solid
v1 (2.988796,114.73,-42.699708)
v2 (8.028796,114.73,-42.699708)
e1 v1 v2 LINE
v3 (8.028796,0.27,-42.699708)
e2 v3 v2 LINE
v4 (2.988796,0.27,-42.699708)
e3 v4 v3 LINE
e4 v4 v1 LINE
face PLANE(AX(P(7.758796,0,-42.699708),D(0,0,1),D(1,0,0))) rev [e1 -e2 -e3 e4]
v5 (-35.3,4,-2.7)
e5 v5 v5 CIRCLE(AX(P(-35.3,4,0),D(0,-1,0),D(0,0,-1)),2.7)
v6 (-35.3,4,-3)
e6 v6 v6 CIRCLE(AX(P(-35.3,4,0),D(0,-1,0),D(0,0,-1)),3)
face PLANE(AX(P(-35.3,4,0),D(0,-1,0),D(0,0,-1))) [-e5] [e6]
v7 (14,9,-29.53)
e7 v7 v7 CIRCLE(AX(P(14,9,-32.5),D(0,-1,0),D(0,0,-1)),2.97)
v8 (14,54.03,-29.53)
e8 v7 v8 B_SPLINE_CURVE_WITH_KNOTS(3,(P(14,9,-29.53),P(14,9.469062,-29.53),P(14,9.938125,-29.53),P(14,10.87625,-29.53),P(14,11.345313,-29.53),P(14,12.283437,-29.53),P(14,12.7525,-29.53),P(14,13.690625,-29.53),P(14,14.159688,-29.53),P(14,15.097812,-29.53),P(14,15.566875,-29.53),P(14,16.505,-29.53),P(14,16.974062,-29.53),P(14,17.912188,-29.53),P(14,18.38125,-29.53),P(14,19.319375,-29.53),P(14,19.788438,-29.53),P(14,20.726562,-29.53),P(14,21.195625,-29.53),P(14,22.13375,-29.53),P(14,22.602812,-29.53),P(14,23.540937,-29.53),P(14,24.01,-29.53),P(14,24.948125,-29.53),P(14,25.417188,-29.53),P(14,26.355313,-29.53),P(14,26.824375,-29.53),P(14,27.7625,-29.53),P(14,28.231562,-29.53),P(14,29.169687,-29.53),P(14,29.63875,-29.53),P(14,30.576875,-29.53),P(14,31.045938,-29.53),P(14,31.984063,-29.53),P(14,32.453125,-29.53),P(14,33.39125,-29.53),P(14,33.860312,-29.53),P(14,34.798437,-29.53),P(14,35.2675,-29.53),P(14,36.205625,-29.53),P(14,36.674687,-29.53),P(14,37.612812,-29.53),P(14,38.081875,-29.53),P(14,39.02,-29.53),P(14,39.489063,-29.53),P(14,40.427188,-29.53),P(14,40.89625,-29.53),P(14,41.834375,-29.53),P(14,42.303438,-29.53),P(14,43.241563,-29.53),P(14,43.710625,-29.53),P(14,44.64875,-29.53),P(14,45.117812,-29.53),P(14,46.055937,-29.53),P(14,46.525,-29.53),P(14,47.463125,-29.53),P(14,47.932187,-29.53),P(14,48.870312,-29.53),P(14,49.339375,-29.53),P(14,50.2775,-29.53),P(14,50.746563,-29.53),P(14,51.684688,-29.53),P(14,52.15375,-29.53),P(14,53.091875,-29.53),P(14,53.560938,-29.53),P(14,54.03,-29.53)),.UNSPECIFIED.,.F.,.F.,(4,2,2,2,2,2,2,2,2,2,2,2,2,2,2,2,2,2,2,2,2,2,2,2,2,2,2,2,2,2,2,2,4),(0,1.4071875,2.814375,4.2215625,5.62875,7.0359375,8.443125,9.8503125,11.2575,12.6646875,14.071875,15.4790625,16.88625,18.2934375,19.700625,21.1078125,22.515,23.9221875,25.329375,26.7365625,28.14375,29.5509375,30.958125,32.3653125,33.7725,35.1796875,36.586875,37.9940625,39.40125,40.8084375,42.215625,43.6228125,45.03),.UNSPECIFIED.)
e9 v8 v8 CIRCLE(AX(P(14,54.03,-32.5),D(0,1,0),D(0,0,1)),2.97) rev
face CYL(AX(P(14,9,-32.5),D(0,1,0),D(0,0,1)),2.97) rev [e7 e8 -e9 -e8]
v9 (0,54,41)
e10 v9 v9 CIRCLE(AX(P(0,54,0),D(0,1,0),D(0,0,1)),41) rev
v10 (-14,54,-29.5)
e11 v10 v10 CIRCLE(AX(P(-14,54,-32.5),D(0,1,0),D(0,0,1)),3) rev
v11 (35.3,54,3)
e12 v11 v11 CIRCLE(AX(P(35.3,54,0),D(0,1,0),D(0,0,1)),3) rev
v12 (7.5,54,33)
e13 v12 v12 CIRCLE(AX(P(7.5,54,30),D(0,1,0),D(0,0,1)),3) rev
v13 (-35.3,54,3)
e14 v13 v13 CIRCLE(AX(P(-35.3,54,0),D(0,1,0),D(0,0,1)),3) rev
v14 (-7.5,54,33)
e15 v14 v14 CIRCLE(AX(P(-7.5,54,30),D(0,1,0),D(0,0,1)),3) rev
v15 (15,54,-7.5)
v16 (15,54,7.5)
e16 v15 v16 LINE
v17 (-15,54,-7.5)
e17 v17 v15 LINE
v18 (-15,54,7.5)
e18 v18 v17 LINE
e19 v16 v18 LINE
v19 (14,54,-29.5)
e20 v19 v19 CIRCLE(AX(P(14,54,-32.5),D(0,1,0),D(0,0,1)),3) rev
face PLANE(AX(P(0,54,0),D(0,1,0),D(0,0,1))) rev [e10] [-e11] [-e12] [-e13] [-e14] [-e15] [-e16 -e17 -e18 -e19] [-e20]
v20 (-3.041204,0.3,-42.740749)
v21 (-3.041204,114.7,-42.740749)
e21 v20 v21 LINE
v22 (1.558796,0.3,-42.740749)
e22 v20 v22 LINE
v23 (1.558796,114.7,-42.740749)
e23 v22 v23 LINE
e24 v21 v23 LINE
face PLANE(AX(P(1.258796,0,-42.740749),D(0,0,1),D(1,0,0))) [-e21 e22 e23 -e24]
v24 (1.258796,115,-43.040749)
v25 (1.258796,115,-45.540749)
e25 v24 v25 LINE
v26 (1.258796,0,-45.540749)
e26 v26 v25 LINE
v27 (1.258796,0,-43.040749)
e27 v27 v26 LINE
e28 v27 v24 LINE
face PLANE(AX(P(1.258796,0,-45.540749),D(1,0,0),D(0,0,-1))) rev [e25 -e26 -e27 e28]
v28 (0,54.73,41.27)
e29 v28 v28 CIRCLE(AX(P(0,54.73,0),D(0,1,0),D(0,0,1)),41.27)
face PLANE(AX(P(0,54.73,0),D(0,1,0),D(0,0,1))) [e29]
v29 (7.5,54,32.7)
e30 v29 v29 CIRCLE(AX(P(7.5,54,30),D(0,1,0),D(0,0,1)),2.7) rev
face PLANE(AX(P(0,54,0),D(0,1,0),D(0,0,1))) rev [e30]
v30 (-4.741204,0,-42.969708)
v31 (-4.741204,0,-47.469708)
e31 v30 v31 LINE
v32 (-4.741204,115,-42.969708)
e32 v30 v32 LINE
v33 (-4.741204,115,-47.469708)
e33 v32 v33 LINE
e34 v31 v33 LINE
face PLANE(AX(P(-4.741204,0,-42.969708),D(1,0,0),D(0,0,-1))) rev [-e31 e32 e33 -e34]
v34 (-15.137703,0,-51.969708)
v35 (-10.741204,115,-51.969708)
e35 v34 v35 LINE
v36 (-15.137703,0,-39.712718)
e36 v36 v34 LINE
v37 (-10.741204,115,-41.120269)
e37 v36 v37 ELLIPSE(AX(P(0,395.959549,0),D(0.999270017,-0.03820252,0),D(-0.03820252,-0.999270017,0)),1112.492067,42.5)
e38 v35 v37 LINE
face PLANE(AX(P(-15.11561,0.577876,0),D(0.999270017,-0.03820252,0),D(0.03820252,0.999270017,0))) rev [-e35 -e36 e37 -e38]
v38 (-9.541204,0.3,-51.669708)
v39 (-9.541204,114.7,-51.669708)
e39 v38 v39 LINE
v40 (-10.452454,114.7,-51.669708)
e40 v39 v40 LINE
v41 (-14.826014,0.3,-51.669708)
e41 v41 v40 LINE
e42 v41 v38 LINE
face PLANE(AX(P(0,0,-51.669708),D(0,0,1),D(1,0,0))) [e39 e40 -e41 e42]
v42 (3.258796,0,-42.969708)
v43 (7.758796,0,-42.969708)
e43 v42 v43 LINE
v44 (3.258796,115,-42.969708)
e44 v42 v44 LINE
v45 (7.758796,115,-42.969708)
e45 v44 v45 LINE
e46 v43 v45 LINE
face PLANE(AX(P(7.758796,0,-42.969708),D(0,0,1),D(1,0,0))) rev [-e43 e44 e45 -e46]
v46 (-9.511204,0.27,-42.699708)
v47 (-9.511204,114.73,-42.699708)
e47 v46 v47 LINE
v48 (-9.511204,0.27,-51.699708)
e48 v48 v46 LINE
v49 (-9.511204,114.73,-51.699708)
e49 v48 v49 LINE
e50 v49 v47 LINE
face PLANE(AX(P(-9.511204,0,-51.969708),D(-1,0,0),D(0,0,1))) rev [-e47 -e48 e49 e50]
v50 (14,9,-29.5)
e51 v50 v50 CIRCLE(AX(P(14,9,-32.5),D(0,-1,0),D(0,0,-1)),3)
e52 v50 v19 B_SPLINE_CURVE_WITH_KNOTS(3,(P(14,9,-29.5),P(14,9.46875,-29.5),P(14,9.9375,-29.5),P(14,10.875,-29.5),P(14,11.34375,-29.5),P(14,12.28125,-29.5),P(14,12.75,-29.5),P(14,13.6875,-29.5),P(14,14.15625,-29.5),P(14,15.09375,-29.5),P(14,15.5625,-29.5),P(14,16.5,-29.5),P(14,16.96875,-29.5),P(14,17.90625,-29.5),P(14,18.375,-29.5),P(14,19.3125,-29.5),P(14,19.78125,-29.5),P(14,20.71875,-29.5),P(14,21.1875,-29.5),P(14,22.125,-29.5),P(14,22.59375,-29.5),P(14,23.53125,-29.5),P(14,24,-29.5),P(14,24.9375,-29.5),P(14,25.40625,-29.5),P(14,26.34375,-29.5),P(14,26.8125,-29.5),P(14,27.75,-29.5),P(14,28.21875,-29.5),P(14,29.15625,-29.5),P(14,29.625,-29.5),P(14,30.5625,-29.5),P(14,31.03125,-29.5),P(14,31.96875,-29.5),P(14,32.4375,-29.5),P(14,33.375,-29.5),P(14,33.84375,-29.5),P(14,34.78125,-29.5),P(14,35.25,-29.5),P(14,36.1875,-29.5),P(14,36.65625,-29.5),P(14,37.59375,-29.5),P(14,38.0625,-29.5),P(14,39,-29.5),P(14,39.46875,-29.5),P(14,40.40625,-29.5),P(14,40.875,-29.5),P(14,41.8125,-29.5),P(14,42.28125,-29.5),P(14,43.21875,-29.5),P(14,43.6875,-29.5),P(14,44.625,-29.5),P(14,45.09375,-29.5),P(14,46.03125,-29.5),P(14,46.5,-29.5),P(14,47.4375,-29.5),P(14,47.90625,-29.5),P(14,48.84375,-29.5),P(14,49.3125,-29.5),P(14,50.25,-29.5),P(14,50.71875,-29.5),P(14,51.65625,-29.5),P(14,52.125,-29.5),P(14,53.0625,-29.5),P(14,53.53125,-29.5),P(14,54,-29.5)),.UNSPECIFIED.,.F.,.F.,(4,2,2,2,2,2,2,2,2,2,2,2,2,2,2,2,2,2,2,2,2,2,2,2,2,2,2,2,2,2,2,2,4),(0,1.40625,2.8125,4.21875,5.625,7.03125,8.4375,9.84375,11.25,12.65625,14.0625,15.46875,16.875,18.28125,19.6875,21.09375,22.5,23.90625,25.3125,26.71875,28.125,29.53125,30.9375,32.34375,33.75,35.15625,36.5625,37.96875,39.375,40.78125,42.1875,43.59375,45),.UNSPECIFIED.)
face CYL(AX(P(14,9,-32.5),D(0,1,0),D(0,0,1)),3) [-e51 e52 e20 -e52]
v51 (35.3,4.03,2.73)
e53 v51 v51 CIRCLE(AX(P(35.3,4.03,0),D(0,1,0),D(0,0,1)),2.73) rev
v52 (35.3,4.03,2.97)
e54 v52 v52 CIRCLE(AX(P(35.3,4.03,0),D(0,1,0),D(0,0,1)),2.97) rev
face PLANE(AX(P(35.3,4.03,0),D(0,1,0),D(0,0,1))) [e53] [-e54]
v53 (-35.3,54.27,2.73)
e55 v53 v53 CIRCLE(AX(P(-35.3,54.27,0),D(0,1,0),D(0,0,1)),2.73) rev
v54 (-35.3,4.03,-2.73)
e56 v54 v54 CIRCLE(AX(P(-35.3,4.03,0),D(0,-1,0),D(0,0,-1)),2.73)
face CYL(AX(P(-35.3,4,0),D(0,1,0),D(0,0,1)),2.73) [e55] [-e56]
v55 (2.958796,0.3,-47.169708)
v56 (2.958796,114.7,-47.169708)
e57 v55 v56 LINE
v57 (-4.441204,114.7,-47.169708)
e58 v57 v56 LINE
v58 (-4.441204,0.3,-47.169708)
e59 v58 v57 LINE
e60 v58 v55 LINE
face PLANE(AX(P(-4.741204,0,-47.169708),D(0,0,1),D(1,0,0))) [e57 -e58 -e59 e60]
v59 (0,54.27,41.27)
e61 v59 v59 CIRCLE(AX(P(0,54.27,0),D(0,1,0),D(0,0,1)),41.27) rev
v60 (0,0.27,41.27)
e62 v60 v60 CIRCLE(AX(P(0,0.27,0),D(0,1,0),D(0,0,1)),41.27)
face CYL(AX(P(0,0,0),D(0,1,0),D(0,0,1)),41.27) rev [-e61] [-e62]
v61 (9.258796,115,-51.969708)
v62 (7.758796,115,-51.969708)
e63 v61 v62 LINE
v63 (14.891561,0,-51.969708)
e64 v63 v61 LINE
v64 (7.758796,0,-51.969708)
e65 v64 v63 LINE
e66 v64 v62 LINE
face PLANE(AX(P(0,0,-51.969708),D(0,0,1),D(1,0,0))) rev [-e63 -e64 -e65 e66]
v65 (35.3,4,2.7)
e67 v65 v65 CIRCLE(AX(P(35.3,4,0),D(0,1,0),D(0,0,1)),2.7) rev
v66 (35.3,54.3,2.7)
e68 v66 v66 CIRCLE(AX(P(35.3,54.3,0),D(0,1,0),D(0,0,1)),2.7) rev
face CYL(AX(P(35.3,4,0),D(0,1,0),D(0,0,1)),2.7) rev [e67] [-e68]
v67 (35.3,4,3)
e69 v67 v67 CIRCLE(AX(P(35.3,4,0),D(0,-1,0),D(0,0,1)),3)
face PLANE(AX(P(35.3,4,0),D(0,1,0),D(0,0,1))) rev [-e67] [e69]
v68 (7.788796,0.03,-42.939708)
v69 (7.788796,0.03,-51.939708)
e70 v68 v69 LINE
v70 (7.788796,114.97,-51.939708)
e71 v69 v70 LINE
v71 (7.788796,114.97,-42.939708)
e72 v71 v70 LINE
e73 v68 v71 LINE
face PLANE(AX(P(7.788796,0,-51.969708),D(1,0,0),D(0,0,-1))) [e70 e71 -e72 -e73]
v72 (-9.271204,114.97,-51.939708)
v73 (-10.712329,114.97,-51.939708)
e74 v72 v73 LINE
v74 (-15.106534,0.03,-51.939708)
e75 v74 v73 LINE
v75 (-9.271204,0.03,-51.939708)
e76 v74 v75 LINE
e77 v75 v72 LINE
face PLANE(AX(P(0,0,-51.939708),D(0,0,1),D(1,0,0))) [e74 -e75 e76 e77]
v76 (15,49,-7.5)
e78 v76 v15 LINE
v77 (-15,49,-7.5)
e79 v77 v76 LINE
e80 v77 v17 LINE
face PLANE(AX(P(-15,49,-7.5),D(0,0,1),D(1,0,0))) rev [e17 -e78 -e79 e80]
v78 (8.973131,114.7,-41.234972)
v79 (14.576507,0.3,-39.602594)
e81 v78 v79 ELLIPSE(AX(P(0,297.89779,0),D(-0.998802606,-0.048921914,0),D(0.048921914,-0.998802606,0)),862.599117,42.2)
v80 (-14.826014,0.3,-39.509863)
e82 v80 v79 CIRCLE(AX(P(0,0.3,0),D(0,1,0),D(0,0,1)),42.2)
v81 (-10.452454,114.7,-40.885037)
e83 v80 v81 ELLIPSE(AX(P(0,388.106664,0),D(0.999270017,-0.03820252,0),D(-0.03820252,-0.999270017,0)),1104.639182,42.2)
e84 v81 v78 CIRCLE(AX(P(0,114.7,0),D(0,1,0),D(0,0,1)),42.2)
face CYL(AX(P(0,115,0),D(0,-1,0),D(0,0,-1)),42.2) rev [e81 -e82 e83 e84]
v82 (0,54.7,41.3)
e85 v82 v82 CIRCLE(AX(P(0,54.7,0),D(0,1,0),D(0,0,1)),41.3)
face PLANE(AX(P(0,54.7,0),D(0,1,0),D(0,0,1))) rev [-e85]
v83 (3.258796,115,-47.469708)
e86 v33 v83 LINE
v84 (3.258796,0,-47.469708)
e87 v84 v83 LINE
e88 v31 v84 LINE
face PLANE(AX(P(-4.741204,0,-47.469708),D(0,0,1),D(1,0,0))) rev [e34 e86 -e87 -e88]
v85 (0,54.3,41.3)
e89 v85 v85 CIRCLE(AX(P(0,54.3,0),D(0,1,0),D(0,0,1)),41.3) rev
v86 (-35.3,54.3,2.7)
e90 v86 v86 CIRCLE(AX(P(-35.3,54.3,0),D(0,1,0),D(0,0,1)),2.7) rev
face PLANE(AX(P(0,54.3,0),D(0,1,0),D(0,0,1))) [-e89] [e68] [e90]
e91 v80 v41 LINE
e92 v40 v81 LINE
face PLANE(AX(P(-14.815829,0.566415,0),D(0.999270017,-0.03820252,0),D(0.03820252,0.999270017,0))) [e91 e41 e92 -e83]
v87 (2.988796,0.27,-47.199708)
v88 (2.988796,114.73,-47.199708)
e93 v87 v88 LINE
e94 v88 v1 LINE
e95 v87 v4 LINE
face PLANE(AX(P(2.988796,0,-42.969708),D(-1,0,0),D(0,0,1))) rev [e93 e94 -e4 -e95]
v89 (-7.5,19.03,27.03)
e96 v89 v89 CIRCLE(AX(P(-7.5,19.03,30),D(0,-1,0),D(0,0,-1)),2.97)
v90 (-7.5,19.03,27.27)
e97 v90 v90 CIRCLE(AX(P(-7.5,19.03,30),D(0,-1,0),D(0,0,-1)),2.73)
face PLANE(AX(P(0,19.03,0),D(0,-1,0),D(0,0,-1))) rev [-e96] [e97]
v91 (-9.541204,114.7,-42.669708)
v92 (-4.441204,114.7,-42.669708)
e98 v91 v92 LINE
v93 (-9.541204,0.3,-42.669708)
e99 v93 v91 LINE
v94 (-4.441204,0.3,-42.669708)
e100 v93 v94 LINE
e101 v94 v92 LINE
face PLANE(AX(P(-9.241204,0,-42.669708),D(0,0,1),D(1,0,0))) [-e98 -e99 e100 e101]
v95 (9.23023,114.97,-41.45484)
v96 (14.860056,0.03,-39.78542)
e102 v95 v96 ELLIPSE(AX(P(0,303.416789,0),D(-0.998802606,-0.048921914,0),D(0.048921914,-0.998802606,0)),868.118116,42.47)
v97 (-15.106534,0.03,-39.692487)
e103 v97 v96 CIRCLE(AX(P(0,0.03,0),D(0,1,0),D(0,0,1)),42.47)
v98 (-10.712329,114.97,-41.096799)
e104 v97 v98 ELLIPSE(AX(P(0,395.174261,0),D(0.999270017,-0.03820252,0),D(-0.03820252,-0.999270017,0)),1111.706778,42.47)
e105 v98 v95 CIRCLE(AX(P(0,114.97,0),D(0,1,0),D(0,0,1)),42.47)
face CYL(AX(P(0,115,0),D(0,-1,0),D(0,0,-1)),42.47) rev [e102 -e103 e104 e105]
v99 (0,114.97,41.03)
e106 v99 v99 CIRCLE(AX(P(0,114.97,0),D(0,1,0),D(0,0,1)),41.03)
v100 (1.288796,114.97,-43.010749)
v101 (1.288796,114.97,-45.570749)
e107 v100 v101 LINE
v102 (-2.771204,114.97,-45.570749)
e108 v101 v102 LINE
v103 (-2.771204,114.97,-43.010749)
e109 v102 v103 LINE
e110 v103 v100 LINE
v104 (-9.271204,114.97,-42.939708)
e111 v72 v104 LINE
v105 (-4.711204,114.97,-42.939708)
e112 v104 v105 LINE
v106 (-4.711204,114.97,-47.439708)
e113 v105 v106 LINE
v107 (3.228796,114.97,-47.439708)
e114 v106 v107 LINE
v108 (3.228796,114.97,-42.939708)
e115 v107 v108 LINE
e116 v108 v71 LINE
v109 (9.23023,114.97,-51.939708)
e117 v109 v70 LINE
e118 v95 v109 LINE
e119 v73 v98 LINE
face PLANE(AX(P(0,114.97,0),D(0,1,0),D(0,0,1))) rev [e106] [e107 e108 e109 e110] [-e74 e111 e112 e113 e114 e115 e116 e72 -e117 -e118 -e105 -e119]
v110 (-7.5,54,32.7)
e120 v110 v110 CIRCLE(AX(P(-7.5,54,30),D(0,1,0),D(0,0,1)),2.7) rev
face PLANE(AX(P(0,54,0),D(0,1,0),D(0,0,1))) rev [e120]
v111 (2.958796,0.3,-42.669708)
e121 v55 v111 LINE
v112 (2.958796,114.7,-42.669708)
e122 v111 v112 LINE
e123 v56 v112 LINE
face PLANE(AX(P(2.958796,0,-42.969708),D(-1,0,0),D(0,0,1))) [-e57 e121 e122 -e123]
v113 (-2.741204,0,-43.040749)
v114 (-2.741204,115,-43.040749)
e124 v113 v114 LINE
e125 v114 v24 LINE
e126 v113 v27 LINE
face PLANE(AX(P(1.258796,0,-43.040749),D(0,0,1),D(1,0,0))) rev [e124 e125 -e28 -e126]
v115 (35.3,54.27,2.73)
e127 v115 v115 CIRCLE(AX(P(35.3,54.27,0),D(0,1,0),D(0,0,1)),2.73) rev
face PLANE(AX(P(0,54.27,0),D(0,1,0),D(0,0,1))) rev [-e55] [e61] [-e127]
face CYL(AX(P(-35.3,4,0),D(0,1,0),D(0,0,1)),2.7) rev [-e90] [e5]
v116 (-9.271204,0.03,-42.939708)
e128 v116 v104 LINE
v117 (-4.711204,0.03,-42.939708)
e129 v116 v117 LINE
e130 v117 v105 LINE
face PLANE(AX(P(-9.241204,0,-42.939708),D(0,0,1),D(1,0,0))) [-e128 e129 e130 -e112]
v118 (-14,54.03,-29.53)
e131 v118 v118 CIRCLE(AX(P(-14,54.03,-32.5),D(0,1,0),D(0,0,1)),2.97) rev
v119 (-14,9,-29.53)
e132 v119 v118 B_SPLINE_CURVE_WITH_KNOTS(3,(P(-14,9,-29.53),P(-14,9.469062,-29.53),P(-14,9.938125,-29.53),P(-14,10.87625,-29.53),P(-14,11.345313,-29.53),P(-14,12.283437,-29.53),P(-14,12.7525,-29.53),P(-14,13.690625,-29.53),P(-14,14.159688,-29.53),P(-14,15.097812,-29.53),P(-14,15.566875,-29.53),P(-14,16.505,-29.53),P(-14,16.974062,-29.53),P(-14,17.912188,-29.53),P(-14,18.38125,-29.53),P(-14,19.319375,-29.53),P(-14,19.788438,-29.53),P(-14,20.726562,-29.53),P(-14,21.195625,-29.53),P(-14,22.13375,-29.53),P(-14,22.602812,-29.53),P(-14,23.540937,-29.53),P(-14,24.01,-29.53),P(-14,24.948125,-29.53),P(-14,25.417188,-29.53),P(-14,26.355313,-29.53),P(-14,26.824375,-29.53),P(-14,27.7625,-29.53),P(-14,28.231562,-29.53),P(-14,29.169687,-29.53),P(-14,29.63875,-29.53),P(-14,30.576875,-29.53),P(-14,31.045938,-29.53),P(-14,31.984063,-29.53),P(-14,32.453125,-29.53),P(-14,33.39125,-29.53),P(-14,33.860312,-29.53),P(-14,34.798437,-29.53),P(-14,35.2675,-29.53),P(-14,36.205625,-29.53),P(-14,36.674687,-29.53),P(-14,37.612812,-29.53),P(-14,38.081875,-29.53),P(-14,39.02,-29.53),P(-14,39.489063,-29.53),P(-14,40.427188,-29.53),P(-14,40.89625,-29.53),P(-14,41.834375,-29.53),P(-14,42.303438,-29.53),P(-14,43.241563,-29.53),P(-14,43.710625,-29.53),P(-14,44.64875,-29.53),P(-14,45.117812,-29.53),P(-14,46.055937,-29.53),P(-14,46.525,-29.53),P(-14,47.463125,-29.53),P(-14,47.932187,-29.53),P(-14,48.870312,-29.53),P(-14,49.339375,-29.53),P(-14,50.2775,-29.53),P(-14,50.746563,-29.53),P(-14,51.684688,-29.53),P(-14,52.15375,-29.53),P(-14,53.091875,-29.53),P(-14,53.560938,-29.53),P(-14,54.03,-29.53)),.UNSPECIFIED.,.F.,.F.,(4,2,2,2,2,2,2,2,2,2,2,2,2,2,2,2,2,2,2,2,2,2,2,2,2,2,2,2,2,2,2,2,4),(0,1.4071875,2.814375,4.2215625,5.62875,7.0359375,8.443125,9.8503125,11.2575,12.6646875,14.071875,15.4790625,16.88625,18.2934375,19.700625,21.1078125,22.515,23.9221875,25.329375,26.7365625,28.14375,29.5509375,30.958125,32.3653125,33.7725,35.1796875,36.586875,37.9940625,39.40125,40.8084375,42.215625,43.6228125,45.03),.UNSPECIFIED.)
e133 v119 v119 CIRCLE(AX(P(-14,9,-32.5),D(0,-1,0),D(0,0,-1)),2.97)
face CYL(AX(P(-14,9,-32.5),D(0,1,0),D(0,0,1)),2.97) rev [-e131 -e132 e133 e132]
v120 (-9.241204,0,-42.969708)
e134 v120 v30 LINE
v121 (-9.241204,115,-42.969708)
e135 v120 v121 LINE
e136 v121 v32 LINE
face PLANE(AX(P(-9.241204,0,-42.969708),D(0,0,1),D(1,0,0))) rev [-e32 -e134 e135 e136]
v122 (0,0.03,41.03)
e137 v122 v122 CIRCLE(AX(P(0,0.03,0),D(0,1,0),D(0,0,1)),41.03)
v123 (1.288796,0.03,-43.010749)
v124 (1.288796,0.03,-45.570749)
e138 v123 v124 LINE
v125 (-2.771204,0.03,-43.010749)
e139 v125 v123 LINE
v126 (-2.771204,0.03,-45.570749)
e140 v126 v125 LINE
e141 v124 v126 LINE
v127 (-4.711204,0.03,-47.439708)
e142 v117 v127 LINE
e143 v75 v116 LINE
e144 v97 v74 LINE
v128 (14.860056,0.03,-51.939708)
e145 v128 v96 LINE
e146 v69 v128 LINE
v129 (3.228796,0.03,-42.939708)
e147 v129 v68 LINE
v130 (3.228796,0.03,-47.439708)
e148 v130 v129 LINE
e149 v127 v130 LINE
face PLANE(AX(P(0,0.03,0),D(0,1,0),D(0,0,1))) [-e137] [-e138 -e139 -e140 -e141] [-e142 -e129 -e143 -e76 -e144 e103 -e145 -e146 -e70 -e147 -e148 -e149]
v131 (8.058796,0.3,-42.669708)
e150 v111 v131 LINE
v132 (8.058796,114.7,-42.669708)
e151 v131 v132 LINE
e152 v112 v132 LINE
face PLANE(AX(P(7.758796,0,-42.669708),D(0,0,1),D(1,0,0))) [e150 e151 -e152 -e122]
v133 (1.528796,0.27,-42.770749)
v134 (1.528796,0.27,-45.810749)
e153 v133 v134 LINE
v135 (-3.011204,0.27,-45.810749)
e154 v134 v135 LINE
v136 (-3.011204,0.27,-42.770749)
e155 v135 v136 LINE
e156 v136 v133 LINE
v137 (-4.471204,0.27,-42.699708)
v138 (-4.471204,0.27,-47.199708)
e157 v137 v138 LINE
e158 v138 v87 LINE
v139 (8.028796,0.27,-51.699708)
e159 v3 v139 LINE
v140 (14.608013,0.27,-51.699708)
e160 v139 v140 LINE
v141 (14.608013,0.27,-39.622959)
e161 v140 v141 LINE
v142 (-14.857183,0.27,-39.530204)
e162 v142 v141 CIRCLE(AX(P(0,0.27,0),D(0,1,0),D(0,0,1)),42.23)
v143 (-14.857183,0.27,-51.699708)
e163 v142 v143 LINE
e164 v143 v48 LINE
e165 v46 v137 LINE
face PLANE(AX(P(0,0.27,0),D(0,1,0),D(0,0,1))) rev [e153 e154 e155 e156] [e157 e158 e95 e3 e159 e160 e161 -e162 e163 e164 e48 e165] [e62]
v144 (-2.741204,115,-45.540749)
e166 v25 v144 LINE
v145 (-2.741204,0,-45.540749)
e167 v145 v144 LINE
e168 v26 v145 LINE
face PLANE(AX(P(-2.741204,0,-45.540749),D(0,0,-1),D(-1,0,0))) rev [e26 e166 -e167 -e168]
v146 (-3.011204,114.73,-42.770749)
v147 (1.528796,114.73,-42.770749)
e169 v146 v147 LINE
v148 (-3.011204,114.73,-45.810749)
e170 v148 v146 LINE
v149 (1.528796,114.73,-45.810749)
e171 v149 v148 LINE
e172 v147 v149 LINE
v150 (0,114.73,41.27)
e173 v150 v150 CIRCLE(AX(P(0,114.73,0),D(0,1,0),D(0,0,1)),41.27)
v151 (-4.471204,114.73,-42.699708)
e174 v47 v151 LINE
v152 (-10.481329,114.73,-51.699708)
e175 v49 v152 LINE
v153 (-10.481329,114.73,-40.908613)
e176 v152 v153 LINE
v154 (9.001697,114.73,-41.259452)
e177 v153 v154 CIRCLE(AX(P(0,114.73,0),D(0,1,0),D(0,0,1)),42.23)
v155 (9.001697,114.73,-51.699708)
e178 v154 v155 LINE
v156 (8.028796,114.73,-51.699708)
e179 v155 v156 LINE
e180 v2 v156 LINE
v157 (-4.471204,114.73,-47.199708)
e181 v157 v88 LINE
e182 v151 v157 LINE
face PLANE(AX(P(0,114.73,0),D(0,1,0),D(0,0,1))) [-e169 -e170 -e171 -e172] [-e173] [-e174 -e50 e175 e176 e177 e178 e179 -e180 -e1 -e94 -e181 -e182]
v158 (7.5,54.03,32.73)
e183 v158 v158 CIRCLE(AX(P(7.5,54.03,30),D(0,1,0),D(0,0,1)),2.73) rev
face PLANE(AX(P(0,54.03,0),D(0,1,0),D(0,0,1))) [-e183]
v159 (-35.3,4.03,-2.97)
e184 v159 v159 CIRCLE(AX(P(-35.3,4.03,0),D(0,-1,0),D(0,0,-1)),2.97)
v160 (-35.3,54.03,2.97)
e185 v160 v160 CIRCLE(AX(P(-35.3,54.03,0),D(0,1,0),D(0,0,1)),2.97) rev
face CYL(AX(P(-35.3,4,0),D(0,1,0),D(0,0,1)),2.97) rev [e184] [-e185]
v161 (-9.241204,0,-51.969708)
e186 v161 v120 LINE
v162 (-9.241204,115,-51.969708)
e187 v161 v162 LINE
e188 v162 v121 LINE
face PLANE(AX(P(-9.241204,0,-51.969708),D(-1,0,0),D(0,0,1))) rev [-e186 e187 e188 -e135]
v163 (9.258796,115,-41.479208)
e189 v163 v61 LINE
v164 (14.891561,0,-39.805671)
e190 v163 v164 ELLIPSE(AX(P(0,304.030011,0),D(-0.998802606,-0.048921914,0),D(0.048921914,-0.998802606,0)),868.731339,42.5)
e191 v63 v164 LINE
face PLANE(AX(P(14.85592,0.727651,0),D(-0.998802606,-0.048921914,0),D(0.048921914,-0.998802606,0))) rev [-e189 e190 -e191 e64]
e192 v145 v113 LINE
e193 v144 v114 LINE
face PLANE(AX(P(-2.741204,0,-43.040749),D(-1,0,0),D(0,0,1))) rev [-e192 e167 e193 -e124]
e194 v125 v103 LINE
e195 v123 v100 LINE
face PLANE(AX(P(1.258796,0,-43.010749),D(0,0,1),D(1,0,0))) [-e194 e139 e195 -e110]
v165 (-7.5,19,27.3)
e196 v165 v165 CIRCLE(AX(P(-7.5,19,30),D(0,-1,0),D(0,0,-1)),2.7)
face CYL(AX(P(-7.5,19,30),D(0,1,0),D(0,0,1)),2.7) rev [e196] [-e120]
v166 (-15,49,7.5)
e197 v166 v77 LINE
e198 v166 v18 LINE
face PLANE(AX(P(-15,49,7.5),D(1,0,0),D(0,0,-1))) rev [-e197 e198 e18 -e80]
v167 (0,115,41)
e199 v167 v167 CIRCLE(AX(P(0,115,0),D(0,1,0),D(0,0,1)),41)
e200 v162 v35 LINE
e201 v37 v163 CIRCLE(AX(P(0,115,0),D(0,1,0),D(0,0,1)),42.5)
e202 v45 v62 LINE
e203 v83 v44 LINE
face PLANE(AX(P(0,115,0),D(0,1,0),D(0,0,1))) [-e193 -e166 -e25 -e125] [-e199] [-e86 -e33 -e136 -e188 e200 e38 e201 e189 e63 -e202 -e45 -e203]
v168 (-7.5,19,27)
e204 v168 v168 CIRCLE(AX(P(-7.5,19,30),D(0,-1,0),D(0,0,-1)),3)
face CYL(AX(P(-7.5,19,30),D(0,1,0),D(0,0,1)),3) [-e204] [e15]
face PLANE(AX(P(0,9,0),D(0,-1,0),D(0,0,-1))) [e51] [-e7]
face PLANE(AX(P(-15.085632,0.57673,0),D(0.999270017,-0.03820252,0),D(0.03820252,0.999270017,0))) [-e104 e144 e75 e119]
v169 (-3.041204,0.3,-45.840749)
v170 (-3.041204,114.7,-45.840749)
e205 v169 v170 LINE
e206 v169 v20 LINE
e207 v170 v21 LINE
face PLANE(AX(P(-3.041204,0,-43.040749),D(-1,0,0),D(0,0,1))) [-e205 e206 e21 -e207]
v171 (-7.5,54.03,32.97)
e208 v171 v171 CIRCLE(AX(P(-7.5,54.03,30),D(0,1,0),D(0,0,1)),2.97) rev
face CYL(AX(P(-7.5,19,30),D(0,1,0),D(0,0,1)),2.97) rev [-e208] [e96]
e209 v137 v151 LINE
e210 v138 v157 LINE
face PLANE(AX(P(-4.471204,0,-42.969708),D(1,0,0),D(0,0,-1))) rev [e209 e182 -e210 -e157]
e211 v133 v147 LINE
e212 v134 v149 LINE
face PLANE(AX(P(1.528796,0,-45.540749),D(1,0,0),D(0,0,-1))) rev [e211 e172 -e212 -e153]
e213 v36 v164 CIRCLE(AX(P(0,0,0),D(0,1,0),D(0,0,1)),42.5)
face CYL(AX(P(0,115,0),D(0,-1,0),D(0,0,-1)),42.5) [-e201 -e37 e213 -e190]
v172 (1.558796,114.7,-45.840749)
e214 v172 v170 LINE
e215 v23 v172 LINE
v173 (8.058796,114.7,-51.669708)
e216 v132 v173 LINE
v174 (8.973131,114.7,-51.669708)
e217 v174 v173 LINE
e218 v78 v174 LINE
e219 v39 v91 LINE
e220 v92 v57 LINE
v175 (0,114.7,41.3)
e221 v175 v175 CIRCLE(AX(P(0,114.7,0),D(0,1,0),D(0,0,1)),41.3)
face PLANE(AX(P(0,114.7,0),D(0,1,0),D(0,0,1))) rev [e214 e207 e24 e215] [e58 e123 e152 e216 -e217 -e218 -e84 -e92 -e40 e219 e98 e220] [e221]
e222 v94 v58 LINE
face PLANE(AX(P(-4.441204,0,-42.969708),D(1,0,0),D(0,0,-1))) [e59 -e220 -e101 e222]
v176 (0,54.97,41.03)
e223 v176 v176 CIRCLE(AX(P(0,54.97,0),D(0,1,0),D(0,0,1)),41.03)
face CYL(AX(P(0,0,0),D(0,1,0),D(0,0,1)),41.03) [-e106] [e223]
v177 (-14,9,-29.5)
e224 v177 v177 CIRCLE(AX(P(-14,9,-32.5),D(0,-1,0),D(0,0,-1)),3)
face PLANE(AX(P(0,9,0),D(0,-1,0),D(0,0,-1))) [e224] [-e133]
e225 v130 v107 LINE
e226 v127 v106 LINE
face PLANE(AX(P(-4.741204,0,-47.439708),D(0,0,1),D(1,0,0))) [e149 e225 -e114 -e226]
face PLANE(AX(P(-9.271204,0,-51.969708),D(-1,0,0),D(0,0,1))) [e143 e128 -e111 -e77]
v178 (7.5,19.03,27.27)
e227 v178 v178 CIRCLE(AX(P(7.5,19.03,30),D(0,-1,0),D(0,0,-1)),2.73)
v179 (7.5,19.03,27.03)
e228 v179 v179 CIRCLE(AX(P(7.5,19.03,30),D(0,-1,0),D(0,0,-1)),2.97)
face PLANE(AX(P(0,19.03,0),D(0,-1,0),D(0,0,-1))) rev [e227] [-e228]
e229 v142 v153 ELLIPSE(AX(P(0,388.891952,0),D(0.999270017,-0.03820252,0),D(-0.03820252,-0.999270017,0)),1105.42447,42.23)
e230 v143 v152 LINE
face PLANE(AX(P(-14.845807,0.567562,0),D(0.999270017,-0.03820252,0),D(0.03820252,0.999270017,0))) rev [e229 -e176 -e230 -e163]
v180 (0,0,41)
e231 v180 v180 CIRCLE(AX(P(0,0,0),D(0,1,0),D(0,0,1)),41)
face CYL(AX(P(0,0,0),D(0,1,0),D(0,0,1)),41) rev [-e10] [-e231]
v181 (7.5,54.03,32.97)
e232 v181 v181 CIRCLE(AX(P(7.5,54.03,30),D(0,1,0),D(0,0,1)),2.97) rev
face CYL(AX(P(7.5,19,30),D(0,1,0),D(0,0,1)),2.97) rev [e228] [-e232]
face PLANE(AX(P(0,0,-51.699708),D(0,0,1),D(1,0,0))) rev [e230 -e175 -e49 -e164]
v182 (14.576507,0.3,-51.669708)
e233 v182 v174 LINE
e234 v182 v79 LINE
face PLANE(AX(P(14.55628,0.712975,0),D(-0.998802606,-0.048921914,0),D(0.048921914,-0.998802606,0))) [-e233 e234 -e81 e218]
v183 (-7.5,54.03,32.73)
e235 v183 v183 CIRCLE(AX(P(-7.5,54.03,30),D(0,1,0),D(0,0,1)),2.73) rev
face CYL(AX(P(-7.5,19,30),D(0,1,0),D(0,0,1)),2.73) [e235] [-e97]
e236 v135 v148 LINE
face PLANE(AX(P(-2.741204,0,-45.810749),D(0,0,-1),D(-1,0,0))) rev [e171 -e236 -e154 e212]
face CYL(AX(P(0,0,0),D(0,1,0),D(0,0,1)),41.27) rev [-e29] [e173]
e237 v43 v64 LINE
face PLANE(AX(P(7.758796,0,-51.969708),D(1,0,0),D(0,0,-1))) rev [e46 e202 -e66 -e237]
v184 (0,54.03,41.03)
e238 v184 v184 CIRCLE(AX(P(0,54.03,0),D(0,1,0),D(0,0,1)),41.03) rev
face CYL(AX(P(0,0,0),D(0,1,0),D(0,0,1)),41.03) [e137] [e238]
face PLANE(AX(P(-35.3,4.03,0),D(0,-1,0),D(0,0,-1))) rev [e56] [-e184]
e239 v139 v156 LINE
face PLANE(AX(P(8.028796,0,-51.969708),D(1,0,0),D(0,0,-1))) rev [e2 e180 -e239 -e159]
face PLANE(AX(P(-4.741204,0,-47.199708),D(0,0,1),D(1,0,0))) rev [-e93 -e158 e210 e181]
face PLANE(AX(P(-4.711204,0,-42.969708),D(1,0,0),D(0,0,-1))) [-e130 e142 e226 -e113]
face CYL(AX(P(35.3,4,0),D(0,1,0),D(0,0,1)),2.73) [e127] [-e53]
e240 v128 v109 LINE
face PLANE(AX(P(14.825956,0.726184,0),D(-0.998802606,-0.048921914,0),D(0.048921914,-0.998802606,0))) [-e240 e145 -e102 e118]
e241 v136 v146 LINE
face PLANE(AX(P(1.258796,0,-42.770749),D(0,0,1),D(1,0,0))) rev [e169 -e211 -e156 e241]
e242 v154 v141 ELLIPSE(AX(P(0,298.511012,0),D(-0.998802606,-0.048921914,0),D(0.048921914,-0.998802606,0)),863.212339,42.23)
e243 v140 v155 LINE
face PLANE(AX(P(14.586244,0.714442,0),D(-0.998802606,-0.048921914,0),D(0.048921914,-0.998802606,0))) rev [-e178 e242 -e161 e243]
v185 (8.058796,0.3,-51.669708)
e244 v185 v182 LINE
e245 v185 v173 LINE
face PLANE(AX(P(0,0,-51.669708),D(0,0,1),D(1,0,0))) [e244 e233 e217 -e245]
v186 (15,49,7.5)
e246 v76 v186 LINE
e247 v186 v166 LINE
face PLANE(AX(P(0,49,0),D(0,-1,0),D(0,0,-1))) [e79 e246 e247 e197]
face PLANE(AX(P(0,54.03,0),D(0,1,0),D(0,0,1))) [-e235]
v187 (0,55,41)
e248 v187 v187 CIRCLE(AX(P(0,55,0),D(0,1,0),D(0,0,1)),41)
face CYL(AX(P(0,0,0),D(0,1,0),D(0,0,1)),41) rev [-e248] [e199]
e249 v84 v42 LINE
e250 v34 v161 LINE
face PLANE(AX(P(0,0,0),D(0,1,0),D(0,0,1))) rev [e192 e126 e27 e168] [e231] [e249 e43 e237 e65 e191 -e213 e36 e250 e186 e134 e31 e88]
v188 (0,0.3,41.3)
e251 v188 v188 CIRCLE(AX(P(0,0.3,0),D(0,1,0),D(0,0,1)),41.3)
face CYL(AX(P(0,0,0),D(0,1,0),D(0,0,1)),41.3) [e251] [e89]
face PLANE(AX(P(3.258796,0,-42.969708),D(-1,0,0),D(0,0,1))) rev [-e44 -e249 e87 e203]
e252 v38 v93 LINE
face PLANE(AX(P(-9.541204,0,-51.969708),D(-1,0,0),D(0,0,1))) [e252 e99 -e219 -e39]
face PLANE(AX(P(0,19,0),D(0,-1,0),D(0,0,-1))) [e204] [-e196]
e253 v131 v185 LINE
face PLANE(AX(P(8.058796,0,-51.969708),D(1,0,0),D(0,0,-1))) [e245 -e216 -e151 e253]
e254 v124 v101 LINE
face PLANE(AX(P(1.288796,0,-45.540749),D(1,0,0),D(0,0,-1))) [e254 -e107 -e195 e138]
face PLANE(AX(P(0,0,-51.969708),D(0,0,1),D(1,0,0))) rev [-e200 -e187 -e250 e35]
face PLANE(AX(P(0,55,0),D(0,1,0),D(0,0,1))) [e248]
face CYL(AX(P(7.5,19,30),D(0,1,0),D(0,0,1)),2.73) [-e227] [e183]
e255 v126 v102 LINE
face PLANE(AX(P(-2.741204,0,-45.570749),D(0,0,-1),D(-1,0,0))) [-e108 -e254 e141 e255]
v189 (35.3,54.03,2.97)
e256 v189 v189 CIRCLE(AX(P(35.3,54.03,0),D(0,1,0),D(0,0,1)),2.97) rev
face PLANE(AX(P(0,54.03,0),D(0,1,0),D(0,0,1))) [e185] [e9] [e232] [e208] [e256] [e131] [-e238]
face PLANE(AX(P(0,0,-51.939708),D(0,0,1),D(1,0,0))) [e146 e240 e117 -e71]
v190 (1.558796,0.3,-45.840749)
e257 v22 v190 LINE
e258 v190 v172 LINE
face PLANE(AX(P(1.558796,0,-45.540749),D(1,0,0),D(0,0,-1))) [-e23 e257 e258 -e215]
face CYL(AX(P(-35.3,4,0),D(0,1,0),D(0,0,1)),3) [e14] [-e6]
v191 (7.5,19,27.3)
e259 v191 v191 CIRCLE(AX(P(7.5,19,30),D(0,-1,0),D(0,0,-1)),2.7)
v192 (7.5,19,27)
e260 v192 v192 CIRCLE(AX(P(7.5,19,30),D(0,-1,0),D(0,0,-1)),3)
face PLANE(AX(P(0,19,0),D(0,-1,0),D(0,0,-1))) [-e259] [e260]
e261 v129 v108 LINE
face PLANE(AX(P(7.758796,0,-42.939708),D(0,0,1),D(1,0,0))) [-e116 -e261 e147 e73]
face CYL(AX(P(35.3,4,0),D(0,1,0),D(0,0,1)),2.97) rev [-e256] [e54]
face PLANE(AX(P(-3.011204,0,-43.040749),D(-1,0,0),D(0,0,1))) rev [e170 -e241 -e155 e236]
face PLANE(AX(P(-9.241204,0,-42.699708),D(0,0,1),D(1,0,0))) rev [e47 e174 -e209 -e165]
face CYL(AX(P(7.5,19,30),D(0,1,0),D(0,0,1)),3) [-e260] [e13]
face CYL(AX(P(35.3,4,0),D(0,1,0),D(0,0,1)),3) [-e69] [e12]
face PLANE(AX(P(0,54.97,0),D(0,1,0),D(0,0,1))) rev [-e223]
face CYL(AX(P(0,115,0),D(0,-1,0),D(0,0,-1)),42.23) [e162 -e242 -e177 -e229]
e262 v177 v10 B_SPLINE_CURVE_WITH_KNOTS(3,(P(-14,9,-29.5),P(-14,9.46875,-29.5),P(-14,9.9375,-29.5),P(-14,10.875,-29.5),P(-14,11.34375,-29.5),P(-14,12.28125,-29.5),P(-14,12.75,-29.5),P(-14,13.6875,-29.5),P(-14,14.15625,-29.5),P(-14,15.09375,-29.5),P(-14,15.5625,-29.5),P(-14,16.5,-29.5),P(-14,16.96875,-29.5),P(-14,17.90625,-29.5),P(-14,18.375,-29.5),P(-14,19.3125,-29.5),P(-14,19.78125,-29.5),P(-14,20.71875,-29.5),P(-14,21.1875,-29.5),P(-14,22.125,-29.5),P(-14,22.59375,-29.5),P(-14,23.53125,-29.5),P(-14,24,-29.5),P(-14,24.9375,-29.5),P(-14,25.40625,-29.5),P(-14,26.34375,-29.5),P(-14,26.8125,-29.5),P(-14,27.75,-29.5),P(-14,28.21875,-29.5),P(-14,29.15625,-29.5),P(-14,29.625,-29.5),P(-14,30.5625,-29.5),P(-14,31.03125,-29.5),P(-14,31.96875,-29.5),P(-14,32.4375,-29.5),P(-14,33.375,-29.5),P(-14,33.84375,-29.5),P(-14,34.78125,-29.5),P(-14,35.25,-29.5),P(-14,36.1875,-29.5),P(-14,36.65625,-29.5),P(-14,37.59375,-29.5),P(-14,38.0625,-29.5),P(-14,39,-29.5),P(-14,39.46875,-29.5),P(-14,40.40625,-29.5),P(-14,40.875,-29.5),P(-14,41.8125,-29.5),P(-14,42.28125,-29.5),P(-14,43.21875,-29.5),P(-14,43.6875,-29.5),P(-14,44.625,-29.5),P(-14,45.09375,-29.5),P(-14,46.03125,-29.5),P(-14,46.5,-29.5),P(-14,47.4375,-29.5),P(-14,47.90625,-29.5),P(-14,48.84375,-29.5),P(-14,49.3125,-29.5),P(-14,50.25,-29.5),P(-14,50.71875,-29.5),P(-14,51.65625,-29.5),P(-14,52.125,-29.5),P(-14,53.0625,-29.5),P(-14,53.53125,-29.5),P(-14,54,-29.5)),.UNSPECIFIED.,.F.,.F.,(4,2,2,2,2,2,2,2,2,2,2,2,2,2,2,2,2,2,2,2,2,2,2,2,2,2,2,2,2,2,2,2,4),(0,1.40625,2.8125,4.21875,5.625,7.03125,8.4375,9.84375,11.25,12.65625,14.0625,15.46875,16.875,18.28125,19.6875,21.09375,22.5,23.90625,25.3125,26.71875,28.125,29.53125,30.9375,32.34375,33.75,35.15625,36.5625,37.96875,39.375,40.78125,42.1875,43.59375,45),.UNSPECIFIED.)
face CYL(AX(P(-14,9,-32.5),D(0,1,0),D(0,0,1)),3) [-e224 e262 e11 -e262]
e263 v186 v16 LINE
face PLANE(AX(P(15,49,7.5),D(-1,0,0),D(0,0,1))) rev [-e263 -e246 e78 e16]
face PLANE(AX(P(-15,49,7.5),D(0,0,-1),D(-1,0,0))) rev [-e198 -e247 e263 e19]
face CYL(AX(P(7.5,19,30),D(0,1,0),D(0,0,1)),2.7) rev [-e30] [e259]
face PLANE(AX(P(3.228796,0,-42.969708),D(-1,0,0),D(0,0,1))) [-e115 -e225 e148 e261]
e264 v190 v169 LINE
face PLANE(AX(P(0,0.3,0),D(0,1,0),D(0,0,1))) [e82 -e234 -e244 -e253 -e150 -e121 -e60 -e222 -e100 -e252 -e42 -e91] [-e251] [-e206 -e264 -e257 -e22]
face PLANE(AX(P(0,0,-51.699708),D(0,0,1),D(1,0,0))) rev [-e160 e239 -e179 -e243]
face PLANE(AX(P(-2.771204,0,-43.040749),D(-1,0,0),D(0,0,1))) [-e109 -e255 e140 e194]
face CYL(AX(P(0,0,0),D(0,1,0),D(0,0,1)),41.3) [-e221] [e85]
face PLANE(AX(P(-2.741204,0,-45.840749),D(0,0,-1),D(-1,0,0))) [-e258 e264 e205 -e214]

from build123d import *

# Parameters (mm, degrees)
SKETCH1_R           = 42.5
BOSS_EXTRUDE1_DEPTH = 115
SKETCH2_R           = 41
CUT_EXTRUDE3_DEPTH  = 115
SKETCH9_W           = 4.5
SKETCH9_H           = 9
CUT_EXTRUDE5_DEPTH  = 115
SKETCH14_W          = 4
SKETCH14_H          = 2.5
CUT_EXTRUDE8_DEPTH  = 115
SKETCH16_W          = 8
SKETCH16_H          = 4.5
CUT_EXTRUDE9_DEPTH  = 115
BOSS_EXTRUDE2_START = 1
SKETCH19_R          = 41
BOSS_EXTRUDE2_DEPTH = 1
SKETCH21_R          = 3
BOSS_EXTRUDE3_DEPTH = 50
SHELL1_T            = -0.3
SKETCH24_R          = 3
BOSS_EXTRUDE4_DEPTH = 35
SHELL2_START        = 19
SHELL2_OUTLINE_R    = 2.7
SHELL2_DEPTH        = 35
SKETCH25_R          = 3
BOSS_EXTRUDE5_DEPTH = 45
SHELL5_T            = -0.03
SKETCH26_W          = 30
SKETCH26_H          = 15
BOSS_EXTRUDE6_DEPTH = 5


# Read off the part's stored shape, not the designer's step: Shell2
with BuildPart() as part:
    # Sketch1 → Boss-Extrude1 (new body)
    with BuildSketch(Plane(origin=(0, 0, 0), x_dir=(1, 0, 0), z_dir=(0, 1, 0))):
        with Locations(Location((0, 0, 0), (0, 0, 270))):
            Circle(SKETCH1_R)
    extrude(amount=BOSS_EXTRUDE1_DEPTH)

    # Sketch7 → Loft2 section 0
    with BuildSketch(Plane.XZ):
        with BuildLine():
            Line((-15.1377027, -38.271634302), (14.891561193, -38.271634302))
            Line((14.891561193, -38.271634302), (14.891561193, -51.96970786))
            Line((14.891561193, -51.96970786), (-15.1377027, -51.96970786))
            Line((-15.1377027, -51.96970786), (-15.1377027, -38.271634302))
        make_face()
    # Sketch6 → Loft2 section 1
    with BuildSketch(Plane(origin=(0, 115, 0), x_dir=(1, 0, 0), z_dir=(0, 1, 0))):
        with BuildLine():
            Line((-10.741203576, 39.96970786), (9.258796424, 39.96970786))
            Line((9.258796424, 39.96970786), (9.258796424, 51.96970786))
            Line((9.258796424, 51.96970786), (-10.741203576, 51.96970786))
            Line((-10.741203576, 51.96970786), (-10.741203576, 39.96970786))
        make_face()
    loft()

    # Sketch2 → Cut-Extrude3 (cut)
    with BuildSketch(Plane(origin=(0, 115, 0), x_dir=(1, 0, 0), z_dir=(0, 1, 0))):
        with Locations(Location((0, 0, 0), (0, 0, 270))):
            Circle(SKETCH2_R)
    extrude(amount=-CUT_EXTRUDE3_DEPTH, mode=Mode.SUBTRACT)

    # Sketch9 → Cut-Extrude5 (cut)
    with BuildSketch(Plane(origin=(0, 115, 0), x_dir=(1, 0, 0), z_dir=(0, 1, 0))):
        with Locations((-6.991203576, 47.46970786)):
            Rectangle(SKETCH9_W, SKETCH9_H)
        with Locations((5.508796424, 47.46970786)):
            Rectangle(SKETCH9_W, SKETCH9_H)
    extrude(amount=-CUT_EXTRUDE5_DEPTH, mode=Mode.SUBTRACT)

    # Sketch14 → Cut-Extrude8 (cut)
    with BuildSketch(Plane(origin=(0, 115, 0), x_dir=(1, 0, 0), z_dir=(0, 1, 0))):
        with Locations((-0.741203576, 44.290749204)):
            Rectangle(SKETCH14_W, SKETCH14_H)
    extrude(amount=-CUT_EXTRUDE8_DEPTH, mode=Mode.SUBTRACT)

    # Sketch16 → Cut-Extrude9 (cut)
    with BuildSketch(Plane(origin=(0, 115, 0), x_dir=(1, 0, 0), z_dir=(0, 1, 0))):
        with Locations((-0.741203576, 49.71970786)):
            Rectangle(SKETCH16_W, SKETCH16_H)
    extrude(amount=-CUT_EXTRUDE9_DEPTH, mode=Mode.SUBTRACT)

    # Sketch19 → Boss-Extrude2 (add)
    with BuildSketch(Plane(origin=(0, 54, 0), x_dir=(1, 0, 0), z_dir=(0, 1, 0)).offset(BOSS_EXTRUDE2_START)):
        with Locations(Location((0, 0, 0), (0, 0, 270))):
            Circle(SKETCH19_R)
    extrude(amount=-BOSS_EXTRUDE2_DEPTH)

    # Sketch21 → Boss-Extrude3 (add)
    with BuildSketch(Plane.XZ.offset(-54)):
        with Locations(Location((-35.3, 0, 0), (0, 0, 90))):
            Circle(SKETCH21_R)
        with Locations(Location((35.3, 0, 0), (0, 0, 90))):
            Circle(SKETCH21_R)
    extrude(amount=BOSS_EXTRUDE3_DEPTH)

    # Shell1
    shell1_openings = [part.faces().sort_by_distance(p)[0] for p in [
        (-35.3, 4, 0),
        (35.3, 4, 0),
    ]]
    offset(amount=SHELL1_T, openings=shell1_openings, kind=Kind.INTERSECTION)

    # Sketch24 → Boss-Extrude4 (add)
    with BuildSketch(Plane.XZ.offset(-54)):
        with Locations(Location((7.5, 30, 0), (0, 0, 90))):
            Circle(SKETCH24_R)
        with Locations(Location((-7.5, 30, 0), (0, 0, 90))):
            Circle(SKETCH24_R)
    extrude(amount=BOSS_EXTRUDE4_DEPTH)

    # Shell2 outline → Shell2 (cut)
    with BuildSketch(Plane(origin=(0, 0, 0), x_dir=(1, 0, 0), z_dir=(0, 1, 0)).offset(SHELL2_START)):
        with Locations((-7.5, -30)):
            Circle(SHELL2_OUTLINE_R)
        with Locations((7.5, -30)):
            Circle(SHELL2_OUTLINE_R)
    extrude(amount=SHELL2_DEPTH, mode=Mode.SUBTRACT)

    # Sketch25 → Boss-Extrude5 (add)
    with BuildSketch(Plane.XZ.offset(-54)):
        with Locations(Location((14, -32.5, 0), (0, 0, 90))):
            Circle(SKETCH25_R)
        with Locations(Location((-14, -32.5, 0), (0, 0, 90))):
            Circle(SKETCH25_R)
    extrude(amount=BOSS_EXTRUDE5_DEPTH)

    # Shell5
    shell5_openings = [part.faces().sort_by_distance(p)[0] for p in [
        (-14, 9, -32.5),
        (14, 9, -32.5),
    ]]
    offset(amount=SHELL5_T, openings=shell5_openings, kind=Kind.INTERSECTION)

    # Sketch26 → Boss-Extrude6 (add)
    with BuildSketch(Plane.XZ.offset(-54)):
        Rectangle(SKETCH26_W, SKETCH26_H)
    extrude(amount=BOSS_EXTRUDE6_DEPTH)


solid = part.part
